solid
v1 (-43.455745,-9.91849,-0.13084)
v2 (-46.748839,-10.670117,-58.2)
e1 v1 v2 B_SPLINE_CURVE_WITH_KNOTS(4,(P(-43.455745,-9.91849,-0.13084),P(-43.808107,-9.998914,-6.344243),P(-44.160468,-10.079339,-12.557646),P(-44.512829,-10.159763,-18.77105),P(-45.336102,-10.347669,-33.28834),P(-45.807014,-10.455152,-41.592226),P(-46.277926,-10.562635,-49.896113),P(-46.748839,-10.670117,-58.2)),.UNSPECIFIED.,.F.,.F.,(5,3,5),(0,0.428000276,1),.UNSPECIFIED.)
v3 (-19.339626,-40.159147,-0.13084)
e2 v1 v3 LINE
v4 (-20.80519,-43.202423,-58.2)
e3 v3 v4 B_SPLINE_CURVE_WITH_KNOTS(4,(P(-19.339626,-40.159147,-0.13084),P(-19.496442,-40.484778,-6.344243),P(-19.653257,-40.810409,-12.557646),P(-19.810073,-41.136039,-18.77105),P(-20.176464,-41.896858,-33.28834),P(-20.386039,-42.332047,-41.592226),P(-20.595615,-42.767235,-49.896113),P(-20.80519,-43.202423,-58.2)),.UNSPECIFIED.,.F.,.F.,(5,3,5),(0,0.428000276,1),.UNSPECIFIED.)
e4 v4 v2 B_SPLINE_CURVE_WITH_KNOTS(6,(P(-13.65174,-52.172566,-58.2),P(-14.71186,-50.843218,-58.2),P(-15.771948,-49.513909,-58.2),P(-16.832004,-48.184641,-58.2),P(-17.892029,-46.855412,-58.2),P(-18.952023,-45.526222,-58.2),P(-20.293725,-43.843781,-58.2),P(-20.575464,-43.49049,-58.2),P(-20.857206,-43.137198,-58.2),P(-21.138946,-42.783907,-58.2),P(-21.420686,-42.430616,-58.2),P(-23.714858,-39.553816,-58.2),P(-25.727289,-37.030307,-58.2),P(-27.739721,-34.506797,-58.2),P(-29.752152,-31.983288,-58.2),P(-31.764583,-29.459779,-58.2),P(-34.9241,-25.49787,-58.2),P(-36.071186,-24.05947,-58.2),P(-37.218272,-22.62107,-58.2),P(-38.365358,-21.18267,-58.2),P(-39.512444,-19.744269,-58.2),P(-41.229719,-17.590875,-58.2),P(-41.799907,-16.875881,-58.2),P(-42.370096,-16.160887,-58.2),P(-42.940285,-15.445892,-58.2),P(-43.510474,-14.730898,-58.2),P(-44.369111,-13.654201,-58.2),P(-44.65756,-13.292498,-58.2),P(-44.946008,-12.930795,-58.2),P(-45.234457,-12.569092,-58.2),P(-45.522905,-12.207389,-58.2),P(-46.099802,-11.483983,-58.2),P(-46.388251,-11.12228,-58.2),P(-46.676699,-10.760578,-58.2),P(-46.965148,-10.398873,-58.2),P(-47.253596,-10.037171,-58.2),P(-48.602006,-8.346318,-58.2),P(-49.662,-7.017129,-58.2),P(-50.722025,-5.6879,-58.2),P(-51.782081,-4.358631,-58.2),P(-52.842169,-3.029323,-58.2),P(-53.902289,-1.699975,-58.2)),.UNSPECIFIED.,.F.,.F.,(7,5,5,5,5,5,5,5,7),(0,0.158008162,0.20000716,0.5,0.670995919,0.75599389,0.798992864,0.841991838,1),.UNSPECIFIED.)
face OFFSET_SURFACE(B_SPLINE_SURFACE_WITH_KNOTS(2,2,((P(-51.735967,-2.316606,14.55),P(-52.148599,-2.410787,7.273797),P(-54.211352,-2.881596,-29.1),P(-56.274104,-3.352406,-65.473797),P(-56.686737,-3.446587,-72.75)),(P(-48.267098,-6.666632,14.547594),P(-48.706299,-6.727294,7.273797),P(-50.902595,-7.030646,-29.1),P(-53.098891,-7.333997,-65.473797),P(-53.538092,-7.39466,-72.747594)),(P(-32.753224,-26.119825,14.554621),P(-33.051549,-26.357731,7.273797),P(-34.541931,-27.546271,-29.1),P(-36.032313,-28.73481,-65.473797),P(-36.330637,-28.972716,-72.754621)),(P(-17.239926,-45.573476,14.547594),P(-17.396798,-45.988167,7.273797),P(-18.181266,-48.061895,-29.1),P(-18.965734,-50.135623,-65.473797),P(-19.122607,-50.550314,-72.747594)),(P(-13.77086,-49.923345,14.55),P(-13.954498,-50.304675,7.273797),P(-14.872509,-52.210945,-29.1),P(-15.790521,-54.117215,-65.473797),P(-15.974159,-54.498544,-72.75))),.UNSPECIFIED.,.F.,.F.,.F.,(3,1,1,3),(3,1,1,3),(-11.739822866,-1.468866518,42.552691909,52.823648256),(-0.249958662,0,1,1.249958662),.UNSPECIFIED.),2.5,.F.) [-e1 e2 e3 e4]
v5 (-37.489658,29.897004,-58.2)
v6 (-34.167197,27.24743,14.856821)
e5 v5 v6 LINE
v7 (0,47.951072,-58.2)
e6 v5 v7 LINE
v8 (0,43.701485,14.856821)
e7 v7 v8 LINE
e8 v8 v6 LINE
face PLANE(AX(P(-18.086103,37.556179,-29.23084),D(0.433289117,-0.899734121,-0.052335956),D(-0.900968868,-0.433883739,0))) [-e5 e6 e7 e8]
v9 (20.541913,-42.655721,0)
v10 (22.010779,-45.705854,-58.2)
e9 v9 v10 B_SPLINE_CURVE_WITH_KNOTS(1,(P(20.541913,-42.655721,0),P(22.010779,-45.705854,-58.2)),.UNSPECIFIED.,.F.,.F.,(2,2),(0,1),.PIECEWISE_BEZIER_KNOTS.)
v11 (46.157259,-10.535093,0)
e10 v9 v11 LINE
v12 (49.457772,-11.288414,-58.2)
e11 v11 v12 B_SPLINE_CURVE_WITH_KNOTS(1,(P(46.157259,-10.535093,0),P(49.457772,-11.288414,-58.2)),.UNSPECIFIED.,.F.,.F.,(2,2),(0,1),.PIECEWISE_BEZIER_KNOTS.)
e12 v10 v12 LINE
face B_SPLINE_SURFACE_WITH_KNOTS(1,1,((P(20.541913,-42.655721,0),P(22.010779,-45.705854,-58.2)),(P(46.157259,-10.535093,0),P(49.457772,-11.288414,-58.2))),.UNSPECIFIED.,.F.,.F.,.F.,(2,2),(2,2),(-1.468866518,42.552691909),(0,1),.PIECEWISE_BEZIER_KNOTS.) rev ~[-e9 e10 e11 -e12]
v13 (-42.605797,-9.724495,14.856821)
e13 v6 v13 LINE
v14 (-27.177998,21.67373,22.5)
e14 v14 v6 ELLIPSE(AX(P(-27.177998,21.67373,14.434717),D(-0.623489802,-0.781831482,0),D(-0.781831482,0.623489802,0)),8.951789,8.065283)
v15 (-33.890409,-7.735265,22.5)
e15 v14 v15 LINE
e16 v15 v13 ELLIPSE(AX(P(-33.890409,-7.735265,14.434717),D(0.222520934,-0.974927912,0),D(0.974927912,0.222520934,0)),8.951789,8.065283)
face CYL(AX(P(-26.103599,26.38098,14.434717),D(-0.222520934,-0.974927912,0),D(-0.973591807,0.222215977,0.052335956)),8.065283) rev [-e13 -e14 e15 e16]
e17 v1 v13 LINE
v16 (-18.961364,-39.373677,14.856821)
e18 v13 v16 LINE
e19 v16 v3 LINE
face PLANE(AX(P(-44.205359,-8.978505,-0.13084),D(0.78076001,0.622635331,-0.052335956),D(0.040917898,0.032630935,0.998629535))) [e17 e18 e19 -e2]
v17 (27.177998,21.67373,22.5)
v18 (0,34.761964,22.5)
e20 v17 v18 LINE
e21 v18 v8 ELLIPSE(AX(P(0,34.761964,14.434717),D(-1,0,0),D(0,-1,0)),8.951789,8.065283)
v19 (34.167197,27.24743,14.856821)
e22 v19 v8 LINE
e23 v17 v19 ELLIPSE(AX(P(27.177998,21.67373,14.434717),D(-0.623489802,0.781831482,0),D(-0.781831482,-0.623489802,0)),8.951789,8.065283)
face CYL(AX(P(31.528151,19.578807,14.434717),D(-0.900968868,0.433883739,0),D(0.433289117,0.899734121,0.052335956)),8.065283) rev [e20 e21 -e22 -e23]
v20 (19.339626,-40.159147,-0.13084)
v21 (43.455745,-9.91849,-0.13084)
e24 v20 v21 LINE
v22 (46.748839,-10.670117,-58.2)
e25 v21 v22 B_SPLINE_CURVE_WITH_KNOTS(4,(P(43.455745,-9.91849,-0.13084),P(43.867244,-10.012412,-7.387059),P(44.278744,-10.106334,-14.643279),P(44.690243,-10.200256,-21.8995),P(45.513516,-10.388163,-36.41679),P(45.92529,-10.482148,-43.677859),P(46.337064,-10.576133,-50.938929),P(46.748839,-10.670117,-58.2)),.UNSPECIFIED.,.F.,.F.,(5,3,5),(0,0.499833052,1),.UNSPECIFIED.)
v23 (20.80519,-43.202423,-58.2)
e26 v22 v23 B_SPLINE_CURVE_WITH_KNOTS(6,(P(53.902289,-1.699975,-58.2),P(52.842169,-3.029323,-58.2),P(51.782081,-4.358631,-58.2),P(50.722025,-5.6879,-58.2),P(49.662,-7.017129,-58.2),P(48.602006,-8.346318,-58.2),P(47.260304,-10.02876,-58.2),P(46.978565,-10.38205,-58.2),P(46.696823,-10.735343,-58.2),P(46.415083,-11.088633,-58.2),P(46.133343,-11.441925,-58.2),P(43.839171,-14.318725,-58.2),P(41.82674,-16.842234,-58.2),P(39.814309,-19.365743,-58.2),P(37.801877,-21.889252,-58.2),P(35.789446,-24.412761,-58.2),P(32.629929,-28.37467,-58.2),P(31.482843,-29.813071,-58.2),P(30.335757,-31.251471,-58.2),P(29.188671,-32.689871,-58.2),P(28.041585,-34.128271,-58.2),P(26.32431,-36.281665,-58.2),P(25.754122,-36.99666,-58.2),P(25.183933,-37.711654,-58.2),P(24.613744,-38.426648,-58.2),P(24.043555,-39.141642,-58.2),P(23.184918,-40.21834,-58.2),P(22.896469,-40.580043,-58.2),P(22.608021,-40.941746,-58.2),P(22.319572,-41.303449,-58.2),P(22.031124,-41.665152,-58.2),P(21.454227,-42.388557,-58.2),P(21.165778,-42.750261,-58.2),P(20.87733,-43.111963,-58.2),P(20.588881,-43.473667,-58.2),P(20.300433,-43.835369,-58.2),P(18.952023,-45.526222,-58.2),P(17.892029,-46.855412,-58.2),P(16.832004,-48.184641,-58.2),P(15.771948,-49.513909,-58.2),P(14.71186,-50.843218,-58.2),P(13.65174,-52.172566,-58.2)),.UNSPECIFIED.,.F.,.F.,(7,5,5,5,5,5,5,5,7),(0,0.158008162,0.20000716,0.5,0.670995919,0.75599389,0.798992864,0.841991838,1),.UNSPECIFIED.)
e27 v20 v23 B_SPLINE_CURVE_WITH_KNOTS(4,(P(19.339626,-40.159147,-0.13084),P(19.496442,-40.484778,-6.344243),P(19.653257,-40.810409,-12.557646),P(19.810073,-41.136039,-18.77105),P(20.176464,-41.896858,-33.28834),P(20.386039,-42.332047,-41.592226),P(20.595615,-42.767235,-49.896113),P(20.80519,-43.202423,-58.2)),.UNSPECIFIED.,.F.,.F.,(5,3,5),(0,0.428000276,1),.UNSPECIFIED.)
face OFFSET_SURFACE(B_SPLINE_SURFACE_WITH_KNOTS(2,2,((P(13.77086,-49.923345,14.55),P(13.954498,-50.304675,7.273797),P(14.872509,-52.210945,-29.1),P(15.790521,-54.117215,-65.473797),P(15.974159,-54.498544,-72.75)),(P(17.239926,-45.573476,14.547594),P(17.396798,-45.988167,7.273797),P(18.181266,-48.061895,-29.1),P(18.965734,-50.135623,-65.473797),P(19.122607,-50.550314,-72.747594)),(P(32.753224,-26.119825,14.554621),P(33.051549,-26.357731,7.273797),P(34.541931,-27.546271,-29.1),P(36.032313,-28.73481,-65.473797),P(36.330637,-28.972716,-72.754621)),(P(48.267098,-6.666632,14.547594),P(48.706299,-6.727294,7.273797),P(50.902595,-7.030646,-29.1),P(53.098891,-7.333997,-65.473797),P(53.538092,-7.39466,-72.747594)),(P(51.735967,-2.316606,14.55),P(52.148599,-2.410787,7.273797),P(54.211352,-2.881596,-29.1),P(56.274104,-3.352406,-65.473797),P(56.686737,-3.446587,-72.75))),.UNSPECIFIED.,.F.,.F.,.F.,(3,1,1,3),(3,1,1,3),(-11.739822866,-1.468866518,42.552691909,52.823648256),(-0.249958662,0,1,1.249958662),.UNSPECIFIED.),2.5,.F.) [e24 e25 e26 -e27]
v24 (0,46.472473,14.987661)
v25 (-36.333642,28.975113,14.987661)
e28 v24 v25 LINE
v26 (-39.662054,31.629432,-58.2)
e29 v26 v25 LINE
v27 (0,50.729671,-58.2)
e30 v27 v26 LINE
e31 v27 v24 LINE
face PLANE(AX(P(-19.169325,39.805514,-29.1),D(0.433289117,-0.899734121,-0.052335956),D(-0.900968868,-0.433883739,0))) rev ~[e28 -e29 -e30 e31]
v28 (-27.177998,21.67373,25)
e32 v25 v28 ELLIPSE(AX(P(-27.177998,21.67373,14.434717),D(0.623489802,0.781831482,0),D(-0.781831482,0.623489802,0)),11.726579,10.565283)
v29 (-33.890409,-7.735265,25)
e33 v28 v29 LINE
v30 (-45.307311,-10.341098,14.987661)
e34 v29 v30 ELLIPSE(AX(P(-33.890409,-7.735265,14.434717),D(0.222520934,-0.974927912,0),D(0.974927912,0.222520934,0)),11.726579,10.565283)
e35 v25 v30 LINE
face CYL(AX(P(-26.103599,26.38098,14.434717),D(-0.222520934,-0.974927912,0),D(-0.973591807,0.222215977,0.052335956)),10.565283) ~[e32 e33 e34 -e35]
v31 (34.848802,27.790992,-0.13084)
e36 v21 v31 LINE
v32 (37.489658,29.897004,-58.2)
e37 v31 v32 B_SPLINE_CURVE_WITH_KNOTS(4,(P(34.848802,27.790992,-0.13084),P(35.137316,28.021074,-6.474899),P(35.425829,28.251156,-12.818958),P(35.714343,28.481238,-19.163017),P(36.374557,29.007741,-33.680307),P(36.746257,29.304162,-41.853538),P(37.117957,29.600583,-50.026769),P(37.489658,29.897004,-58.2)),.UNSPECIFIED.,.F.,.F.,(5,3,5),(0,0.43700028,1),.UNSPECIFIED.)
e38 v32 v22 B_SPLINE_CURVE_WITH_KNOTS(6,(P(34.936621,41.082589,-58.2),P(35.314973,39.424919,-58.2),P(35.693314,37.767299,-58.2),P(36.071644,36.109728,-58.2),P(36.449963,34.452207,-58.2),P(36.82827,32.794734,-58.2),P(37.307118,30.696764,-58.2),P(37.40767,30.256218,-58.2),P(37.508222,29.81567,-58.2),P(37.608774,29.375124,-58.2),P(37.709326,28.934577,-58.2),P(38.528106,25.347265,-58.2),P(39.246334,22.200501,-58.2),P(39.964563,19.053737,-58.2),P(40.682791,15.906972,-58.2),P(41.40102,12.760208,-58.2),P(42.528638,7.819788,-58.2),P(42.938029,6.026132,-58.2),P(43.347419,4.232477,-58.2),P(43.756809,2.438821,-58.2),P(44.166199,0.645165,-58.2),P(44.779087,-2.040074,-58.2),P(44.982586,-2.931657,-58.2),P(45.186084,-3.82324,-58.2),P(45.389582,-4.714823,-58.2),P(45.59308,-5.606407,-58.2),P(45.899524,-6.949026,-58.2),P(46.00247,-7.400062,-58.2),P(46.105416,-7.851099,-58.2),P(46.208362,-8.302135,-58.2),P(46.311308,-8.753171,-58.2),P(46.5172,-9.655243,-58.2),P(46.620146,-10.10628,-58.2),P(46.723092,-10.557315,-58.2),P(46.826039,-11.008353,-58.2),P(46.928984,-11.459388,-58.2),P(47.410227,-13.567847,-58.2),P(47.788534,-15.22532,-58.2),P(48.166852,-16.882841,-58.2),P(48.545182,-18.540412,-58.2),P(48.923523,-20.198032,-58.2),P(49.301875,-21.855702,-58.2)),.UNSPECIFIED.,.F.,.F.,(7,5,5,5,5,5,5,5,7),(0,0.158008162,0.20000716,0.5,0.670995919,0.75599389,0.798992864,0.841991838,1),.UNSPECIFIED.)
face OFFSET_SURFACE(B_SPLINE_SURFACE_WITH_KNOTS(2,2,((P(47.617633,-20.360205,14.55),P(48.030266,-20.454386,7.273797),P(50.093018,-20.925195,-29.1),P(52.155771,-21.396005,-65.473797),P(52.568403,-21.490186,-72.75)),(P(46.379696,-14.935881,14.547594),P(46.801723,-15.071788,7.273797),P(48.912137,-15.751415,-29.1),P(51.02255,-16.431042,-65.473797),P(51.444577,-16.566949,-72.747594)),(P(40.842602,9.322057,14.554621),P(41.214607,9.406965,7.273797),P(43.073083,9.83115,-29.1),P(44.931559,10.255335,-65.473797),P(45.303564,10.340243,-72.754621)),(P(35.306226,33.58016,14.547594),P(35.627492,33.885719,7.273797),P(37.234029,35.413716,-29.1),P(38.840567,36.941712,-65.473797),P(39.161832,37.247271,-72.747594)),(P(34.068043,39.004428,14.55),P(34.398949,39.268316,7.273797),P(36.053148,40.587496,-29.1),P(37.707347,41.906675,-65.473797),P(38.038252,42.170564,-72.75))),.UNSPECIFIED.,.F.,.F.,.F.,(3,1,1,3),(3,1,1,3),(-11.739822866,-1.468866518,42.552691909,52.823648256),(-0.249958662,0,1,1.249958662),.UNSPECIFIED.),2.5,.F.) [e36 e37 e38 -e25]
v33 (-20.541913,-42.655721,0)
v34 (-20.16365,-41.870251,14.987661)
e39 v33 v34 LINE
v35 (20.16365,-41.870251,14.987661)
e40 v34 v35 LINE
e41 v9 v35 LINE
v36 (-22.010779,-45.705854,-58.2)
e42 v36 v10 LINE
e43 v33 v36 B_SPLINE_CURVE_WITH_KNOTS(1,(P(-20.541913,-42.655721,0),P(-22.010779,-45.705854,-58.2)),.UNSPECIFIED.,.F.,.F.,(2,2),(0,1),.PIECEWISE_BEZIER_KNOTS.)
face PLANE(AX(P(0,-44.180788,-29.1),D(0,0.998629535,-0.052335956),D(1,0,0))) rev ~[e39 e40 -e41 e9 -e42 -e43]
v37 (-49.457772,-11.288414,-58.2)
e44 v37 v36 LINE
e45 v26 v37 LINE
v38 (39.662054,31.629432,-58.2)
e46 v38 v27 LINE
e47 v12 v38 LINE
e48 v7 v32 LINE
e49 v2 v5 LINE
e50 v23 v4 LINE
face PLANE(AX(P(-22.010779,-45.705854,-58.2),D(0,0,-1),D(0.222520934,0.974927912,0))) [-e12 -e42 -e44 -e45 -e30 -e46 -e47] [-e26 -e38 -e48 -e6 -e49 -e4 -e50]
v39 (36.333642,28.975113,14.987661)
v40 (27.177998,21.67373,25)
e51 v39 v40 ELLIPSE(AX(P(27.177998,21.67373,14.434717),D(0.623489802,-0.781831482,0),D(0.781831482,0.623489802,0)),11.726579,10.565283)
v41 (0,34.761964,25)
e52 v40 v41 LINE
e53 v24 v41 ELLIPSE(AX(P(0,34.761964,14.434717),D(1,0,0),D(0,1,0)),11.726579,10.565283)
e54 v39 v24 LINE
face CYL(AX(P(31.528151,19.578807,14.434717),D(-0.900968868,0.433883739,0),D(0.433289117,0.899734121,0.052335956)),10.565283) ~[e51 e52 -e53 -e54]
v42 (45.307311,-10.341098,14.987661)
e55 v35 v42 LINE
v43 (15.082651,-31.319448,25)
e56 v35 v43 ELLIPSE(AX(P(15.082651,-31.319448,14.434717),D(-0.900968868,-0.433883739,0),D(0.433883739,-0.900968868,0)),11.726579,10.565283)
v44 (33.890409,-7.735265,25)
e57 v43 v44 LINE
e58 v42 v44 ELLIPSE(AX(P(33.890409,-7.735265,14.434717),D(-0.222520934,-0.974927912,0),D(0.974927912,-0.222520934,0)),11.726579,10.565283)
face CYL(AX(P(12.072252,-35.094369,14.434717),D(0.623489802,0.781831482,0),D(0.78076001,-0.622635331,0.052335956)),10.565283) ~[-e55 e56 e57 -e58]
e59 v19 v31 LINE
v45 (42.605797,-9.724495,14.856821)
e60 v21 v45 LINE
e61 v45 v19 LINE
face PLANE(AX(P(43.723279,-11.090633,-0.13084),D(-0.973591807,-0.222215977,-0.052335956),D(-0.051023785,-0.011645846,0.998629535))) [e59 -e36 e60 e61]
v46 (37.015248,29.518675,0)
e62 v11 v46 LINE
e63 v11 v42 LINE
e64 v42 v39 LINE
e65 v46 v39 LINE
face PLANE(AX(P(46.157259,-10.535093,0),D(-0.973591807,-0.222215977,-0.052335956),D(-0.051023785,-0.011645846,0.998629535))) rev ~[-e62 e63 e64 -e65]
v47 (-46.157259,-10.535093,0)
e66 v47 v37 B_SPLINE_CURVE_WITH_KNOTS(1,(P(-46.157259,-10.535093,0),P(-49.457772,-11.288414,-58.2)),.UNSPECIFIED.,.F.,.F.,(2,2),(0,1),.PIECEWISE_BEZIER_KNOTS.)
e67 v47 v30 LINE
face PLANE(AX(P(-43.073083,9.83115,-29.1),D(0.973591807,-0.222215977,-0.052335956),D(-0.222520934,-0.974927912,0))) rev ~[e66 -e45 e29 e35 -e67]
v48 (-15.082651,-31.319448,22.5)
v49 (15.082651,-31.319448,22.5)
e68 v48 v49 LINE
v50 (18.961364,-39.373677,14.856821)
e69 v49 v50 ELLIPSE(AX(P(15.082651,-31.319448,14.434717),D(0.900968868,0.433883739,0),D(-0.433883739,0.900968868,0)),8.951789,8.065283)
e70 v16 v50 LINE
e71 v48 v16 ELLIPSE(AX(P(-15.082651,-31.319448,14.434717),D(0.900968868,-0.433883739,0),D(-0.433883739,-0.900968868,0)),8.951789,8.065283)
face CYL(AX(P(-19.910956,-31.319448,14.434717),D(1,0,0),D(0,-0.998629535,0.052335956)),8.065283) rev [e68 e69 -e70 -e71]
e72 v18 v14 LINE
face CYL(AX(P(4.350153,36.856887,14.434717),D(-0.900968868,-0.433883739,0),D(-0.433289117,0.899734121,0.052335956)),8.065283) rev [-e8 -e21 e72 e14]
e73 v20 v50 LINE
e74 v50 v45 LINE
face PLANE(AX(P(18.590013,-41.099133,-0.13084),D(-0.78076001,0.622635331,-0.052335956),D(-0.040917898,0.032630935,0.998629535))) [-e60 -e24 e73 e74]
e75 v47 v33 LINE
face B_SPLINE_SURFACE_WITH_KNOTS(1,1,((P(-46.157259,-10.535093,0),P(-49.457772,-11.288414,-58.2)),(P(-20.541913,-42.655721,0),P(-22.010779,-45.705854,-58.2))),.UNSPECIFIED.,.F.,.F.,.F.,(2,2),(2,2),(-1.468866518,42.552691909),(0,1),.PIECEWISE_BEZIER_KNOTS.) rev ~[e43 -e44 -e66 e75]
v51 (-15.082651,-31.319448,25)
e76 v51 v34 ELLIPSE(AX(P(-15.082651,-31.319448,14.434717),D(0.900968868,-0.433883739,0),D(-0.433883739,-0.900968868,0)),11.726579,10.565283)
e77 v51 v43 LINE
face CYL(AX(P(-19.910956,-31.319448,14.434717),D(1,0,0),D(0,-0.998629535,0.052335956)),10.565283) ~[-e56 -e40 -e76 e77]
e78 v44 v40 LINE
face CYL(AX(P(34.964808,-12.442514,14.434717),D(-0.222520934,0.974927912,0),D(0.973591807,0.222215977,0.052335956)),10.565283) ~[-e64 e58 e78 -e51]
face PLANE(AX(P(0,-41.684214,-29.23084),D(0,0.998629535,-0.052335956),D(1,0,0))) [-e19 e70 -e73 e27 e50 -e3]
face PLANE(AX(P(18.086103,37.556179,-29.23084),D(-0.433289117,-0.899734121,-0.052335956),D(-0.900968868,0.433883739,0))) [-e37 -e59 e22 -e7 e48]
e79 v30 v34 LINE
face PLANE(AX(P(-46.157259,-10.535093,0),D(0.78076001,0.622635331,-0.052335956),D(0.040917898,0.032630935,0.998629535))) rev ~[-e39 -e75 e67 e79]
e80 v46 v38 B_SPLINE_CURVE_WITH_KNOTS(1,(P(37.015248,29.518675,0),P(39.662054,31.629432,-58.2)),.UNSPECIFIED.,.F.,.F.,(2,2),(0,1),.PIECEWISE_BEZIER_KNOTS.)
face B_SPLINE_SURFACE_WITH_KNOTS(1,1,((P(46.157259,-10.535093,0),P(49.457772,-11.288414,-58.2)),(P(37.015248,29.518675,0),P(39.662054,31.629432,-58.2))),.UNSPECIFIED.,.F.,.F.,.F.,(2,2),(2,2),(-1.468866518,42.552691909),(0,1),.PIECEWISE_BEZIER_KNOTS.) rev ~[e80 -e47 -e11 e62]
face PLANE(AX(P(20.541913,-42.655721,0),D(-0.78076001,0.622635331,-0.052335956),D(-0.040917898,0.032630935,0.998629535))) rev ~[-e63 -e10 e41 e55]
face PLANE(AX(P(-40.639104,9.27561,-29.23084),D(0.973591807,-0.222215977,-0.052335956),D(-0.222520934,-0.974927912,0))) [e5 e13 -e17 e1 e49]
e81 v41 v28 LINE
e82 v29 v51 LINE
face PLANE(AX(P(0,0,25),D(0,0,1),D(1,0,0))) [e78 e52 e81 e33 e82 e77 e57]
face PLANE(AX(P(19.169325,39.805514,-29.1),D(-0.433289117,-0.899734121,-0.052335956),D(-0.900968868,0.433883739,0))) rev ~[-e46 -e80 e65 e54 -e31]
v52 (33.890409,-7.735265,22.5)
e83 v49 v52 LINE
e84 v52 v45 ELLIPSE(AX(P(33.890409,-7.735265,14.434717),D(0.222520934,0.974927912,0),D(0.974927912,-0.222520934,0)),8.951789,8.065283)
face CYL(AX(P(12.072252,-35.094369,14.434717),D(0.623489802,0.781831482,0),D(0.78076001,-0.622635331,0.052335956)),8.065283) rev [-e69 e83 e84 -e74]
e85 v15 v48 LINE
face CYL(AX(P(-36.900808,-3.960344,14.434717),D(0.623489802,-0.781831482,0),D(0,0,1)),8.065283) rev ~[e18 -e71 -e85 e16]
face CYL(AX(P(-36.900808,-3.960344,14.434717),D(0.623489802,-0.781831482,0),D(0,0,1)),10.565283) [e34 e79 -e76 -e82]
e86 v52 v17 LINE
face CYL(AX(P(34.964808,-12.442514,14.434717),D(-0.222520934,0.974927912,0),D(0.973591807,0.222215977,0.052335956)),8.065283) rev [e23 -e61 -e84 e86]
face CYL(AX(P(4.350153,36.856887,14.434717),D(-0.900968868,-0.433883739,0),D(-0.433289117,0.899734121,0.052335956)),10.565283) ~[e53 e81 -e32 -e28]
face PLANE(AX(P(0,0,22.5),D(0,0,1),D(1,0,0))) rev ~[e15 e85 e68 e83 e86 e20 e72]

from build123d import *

# Parameters (mm, degrees)
F1_DEPTH      = 25
F1_TAPER      = 3
F1_DEPTH_BACK = 58.2
F1_TAPER_BACK = -3
F2_R          = 10.5652829809
F3_T          = -2.5


with BuildPart() as f1:
    # F0 (on Top) → F1 (new body, two sides)
    with BuildSketch(Plane.XY) as f1_sk:
        Polygon((-20.5419126951, -42.6557212379), (20.5419126951, -42.6557212379), (46.1572588473, -10.5350931276), (37.0152476509, 29.5186749845), (0, 47.3442787621), (-37.0152476509, 29.5186749845), (-46.1572588473, -10.5350931276), align=None)
    extrude(amount=F1_DEPTH, taper=F1_TAPER)
    extrude(f1_sk.sketch, amount=-F1_DEPTH_BACK, taper=F1_TAPER_BACK)

    # F2
    f2_edges = [f1.edges().sort_by_distance(p)[0] for p in [
        (-32.325234, -25.778514, 25),
        (0, -41.345527, 25),
        (32.325234, -25.778514, 25),
        (40.308908, 9.200245, 25),
        (17.939152, 37.251032, 25),
        (-17.939152, 37.251032, 25),
        (-40.308908, 9.200245, 25),
    ]]
    fillet(f2_edges, radius=F2_R)

    # F3
    f3_openings = [f1.faces().sort_by_distance(p)[0] for p in [
        (0, 0, -58.2),
    ]]
    offset(amount=F3_T, openings=f3_openings)


solid = f1.part
